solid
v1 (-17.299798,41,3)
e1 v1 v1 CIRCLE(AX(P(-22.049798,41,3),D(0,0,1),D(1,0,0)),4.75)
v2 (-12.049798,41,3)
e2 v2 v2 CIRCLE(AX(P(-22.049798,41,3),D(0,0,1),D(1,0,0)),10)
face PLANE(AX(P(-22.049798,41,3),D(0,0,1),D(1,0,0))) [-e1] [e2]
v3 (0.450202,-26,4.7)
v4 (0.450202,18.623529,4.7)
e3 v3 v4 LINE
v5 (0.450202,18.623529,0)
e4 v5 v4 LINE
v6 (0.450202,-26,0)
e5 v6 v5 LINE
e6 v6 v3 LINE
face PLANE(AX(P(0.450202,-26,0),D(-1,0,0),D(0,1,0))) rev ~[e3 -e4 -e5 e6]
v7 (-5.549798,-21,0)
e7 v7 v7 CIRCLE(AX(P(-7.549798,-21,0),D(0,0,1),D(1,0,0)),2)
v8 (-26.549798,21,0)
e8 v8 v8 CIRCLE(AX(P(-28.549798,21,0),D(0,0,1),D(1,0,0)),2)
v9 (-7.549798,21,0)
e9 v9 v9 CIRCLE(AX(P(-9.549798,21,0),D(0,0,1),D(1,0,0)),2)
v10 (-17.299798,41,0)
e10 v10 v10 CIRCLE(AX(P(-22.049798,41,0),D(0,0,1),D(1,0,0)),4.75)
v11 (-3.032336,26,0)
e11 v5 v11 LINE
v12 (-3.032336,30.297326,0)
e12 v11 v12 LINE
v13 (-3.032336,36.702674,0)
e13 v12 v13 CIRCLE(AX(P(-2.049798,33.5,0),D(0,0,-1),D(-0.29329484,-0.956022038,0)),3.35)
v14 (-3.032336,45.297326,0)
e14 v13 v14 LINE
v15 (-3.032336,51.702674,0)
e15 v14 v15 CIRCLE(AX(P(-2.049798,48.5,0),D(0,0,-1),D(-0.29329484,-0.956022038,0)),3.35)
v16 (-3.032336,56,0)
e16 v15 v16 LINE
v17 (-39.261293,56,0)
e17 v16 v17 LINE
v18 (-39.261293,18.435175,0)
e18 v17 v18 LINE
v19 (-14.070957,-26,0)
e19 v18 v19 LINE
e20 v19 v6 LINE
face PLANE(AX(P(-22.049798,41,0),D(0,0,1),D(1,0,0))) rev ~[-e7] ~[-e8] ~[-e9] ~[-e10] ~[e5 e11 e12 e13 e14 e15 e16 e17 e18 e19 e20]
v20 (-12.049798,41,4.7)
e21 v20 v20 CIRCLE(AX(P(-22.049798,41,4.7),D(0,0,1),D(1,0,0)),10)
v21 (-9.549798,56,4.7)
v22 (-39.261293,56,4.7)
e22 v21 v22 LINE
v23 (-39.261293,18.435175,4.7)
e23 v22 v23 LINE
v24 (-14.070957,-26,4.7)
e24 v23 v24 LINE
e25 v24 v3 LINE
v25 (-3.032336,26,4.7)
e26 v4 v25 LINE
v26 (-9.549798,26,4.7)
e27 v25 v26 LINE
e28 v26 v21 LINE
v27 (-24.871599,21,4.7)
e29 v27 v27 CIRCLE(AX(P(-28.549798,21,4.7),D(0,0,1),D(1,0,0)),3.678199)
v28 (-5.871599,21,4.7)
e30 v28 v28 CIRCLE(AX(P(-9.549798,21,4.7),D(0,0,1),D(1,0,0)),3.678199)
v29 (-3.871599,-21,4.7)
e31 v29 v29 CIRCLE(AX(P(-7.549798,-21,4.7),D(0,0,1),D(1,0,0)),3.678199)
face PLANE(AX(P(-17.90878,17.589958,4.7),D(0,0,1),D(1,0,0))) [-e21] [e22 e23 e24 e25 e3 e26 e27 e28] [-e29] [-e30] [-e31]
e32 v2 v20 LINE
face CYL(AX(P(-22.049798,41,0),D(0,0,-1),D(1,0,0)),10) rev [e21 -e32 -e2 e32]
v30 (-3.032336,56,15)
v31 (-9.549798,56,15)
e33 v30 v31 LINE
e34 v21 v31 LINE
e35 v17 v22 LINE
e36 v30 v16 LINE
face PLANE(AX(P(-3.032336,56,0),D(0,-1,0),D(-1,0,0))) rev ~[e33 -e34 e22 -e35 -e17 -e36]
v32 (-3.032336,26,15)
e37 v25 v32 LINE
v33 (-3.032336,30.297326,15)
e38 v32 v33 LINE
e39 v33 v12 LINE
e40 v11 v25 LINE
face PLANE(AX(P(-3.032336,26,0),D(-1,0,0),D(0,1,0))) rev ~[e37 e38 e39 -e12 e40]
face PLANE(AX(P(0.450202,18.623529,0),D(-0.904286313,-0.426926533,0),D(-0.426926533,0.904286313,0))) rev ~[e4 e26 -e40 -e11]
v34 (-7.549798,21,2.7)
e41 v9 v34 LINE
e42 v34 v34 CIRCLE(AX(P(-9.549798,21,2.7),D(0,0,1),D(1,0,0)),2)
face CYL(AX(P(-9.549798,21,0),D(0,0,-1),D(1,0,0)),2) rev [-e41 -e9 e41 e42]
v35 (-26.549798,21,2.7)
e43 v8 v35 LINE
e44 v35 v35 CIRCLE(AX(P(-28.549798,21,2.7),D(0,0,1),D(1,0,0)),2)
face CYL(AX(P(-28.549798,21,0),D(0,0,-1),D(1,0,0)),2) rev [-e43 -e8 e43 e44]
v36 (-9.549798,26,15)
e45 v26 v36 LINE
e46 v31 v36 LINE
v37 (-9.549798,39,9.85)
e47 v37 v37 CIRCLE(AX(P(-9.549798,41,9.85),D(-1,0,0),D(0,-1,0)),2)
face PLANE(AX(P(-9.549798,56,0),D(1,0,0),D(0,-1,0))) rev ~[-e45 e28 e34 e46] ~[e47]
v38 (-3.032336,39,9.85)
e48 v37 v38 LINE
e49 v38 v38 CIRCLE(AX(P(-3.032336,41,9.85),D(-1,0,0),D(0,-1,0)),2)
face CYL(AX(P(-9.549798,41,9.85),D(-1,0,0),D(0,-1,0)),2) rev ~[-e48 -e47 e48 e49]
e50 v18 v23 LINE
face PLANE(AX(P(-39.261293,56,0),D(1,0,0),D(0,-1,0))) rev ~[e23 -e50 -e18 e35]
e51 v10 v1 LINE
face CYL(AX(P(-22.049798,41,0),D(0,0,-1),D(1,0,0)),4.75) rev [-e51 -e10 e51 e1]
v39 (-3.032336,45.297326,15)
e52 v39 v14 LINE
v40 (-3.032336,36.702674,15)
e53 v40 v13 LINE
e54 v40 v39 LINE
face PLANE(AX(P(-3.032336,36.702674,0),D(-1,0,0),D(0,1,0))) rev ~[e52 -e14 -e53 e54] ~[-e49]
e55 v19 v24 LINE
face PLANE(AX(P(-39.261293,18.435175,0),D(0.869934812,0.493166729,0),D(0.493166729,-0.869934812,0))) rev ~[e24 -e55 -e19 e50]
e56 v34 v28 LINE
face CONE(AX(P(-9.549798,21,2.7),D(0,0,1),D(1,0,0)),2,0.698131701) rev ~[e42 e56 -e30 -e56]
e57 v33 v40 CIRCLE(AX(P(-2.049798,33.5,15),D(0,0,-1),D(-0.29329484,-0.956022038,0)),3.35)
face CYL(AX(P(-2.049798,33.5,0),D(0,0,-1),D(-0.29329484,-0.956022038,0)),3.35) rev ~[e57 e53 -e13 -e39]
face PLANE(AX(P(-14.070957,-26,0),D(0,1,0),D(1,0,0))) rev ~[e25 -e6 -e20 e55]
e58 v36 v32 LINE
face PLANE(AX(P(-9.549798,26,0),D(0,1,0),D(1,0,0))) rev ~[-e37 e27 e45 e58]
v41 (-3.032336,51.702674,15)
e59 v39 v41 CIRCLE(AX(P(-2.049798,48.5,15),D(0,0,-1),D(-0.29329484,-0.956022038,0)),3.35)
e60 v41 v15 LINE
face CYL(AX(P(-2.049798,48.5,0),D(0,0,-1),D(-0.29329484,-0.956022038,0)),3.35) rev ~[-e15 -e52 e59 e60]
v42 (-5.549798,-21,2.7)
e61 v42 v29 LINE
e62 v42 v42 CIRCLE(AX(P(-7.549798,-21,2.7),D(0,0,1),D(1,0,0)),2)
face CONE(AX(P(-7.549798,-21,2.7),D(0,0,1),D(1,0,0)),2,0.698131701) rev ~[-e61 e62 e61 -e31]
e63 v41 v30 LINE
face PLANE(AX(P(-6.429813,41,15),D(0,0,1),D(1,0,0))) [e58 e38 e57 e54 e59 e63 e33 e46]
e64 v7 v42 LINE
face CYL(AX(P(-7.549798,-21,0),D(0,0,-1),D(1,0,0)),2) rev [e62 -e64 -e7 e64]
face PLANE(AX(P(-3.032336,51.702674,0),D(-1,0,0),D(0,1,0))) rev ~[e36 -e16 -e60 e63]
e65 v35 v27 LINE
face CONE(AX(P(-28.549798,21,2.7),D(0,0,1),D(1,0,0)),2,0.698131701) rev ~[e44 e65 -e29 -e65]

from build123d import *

# Parameters (mm, degrees)
F0_R       = 3.5
F0_R_2     = 10
F0_R_3     = 2
F1_DEPTH   = 4.7
F2_SIZE2   = 1.6781992624
F2_SIZE    = 2
F2_2_SIZE2 = 1.6781992624
F2_2_SIZE  = 2
F2_3_SIZE2 = 1.6781992624
F2_3_SIZE  = 2
F3_DEPTH   = 15
F0_R_4     = 4.75
F4_DEPTH   = 3
F5_R       = 2
F6_DEPTH   = 8


# Not quite as in the source:
# - a feature names something its author has since deleted; it is built from what else it names


with BuildPart() as f1:
    # F0 (on Top) → F1 (new body)
    with BuildSketch(Plane.XY):
        Polygon((-39.2612926662, 18.4351751247), (-14.0709569678, -26), (0.450202167, -26), (0.450202167, 18.6235290021), (-3.0323355459, 26), (-9.549797833, 26), (-9.549797833, 56), (-39.2612926662, 56), align=None)
        with Locations((-7.549797833, -21)):
            Circle(F0_R, mode=Mode.SUBTRACT)
        with Locations((-28.549797833, 21)):
            Circle(F0_R, mode=Mode.SUBTRACT)
        with Locations((-22.049797833, 41)):
            Circle(F0_R_2, mode=Mode.SUBTRACT)
        with Locations((-9.549797833, 21)):
            Circle(F0_R, mode=Mode.SUBTRACT)
        with BuildLine():
            Line((-9.549797833, 26), (-3.0323355459, 26))
            Line((-3.0323355459, 26), (-3.0323355459, 30.2973261729))
            ThreePointArc((-3.0323355459, 30.2973261729), (-5.399797833, 33.5), (-3.0323355459, 36.7026738271))
            Line((-3.0323355459, 36.7026738271), (-3.0323355459, 45.2973261729))
            ThreePointArc((-3.0323355459, 45.2973261729), (-5.399797833, 48.5), (-3.0323355459, 51.7026738271))
            Line((-3.0323355459, 51.7026738271), (-3.0323355459, 56))
            Line((-3.0323355459, 56), (-9.549797833, 56))
            Line((-9.549797833, 56), (-9.549797833, 26))
        make_face()
        with Locations((-28.549797833, 21)):
            Circle(F0_R)
        with Locations((-28.549797833, 21)):
            Circle(F0_R_3, mode=Mode.SUBTRACT)
        with Locations((-9.549797833, 21)):
            Circle(F0_R)
        with Locations((-9.549797833, 21)):
            Circle(F0_R_3, mode=Mode.SUBTRACT)
        with Locations((-7.549797833, -21)):
            Circle(F0_R)
        with Locations((-7.549797833, -21)):
            Circle(F0_R_3, mode=Mode.SUBTRACT)
    extrude(amount=F1_DEPTH)

    # F2
    f2_edges = [f1.edges().sort_by_distance(p)[0] for p in [
        (-30.549798, 21, 4.7),
    ]]
    f2_side = f1.faces().sort_by_distance((-30.549798, 21, 2.35))[0]
    chamfer(f2_edges, length=F2_SIZE, length2=F2_SIZE2, reference=f2_side)

    # F2#2
    f2_2_edges = [f1.edges().sort_by_distance(p)[0] for p in [
        (-11.549798, 21, 4.7),
    ]]
    f2_2_side = f1.faces().sort_by_distance((-11.549798, 21, 2.35))[0]
    chamfer(f2_2_edges, length=F2_2_SIZE, length2=F2_2_SIZE2, reference=f2_2_side)

    # F2#3
    f2_3_edges = [f1.edges().sort_by_distance(p)[0] for p in [
        (-9.549798, -21, 4.7),
    ]]
    f2_3_side = f1.faces().sort_by_distance((-9.549798, -21, 2.35))[0]
    chamfer(f2_3_edges, length=F2_3_SIZE, length2=F2_3_SIZE2, reference=f2_3_side)

    # F0 (on Top) → F3 (join)
    with BuildSketch(Plane.XY):
        with BuildLine():
            Line((-9.549797833, 26), (-3.0323355459, 26))
            Line((-3.0323355459, 26), (-3.0323355459, 30.2973261729))
            ThreePointArc((-3.0323355459, 30.2973261729), (-5.399797833, 33.5), (-3.0323355459, 36.7026738271))
            Line((-3.0323355459, 36.7026738271), (-3.0323355459, 45.2973261729))
            ThreePointArc((-3.0323355459, 45.2973261729), (-5.399797833, 48.5), (-3.0323355459, 51.7026738271))
            Line((-3.0323355459, 51.7026738271), (-3.0323355459, 56))
            Line((-3.0323355459, 56), (-9.549797833, 56))
            Line((-9.549797833, 56), (-9.549797833, 26))
        make_face()
    extrude(amount=F3_DEPTH)

    # F0 (on Top) → F4 (join)
    with BuildSketch(Plane.XY):
        with Locations((-22.049797833, 41)):
            Circle(F0_R_2)
        with Locations((-22.049797833, 41)):
            Circle(F0_R_4, mode=Mode.SUBTRACT)
    extrude(amount=F4_DEPTH)

    # F5 (on face) → F6 (cut)
    with BuildSketch(Plane(origin=(-9.549797833, 0, 0), x_dir=(0, -1, 0), z_dir=(-1, 0, 0))):
        with Locations((-41, 9.85)):
            Circle(F5_R)
    extrude(amount=-F6_DEPTH, mode=Mode.SUBTRACT)


solid = f1.part
